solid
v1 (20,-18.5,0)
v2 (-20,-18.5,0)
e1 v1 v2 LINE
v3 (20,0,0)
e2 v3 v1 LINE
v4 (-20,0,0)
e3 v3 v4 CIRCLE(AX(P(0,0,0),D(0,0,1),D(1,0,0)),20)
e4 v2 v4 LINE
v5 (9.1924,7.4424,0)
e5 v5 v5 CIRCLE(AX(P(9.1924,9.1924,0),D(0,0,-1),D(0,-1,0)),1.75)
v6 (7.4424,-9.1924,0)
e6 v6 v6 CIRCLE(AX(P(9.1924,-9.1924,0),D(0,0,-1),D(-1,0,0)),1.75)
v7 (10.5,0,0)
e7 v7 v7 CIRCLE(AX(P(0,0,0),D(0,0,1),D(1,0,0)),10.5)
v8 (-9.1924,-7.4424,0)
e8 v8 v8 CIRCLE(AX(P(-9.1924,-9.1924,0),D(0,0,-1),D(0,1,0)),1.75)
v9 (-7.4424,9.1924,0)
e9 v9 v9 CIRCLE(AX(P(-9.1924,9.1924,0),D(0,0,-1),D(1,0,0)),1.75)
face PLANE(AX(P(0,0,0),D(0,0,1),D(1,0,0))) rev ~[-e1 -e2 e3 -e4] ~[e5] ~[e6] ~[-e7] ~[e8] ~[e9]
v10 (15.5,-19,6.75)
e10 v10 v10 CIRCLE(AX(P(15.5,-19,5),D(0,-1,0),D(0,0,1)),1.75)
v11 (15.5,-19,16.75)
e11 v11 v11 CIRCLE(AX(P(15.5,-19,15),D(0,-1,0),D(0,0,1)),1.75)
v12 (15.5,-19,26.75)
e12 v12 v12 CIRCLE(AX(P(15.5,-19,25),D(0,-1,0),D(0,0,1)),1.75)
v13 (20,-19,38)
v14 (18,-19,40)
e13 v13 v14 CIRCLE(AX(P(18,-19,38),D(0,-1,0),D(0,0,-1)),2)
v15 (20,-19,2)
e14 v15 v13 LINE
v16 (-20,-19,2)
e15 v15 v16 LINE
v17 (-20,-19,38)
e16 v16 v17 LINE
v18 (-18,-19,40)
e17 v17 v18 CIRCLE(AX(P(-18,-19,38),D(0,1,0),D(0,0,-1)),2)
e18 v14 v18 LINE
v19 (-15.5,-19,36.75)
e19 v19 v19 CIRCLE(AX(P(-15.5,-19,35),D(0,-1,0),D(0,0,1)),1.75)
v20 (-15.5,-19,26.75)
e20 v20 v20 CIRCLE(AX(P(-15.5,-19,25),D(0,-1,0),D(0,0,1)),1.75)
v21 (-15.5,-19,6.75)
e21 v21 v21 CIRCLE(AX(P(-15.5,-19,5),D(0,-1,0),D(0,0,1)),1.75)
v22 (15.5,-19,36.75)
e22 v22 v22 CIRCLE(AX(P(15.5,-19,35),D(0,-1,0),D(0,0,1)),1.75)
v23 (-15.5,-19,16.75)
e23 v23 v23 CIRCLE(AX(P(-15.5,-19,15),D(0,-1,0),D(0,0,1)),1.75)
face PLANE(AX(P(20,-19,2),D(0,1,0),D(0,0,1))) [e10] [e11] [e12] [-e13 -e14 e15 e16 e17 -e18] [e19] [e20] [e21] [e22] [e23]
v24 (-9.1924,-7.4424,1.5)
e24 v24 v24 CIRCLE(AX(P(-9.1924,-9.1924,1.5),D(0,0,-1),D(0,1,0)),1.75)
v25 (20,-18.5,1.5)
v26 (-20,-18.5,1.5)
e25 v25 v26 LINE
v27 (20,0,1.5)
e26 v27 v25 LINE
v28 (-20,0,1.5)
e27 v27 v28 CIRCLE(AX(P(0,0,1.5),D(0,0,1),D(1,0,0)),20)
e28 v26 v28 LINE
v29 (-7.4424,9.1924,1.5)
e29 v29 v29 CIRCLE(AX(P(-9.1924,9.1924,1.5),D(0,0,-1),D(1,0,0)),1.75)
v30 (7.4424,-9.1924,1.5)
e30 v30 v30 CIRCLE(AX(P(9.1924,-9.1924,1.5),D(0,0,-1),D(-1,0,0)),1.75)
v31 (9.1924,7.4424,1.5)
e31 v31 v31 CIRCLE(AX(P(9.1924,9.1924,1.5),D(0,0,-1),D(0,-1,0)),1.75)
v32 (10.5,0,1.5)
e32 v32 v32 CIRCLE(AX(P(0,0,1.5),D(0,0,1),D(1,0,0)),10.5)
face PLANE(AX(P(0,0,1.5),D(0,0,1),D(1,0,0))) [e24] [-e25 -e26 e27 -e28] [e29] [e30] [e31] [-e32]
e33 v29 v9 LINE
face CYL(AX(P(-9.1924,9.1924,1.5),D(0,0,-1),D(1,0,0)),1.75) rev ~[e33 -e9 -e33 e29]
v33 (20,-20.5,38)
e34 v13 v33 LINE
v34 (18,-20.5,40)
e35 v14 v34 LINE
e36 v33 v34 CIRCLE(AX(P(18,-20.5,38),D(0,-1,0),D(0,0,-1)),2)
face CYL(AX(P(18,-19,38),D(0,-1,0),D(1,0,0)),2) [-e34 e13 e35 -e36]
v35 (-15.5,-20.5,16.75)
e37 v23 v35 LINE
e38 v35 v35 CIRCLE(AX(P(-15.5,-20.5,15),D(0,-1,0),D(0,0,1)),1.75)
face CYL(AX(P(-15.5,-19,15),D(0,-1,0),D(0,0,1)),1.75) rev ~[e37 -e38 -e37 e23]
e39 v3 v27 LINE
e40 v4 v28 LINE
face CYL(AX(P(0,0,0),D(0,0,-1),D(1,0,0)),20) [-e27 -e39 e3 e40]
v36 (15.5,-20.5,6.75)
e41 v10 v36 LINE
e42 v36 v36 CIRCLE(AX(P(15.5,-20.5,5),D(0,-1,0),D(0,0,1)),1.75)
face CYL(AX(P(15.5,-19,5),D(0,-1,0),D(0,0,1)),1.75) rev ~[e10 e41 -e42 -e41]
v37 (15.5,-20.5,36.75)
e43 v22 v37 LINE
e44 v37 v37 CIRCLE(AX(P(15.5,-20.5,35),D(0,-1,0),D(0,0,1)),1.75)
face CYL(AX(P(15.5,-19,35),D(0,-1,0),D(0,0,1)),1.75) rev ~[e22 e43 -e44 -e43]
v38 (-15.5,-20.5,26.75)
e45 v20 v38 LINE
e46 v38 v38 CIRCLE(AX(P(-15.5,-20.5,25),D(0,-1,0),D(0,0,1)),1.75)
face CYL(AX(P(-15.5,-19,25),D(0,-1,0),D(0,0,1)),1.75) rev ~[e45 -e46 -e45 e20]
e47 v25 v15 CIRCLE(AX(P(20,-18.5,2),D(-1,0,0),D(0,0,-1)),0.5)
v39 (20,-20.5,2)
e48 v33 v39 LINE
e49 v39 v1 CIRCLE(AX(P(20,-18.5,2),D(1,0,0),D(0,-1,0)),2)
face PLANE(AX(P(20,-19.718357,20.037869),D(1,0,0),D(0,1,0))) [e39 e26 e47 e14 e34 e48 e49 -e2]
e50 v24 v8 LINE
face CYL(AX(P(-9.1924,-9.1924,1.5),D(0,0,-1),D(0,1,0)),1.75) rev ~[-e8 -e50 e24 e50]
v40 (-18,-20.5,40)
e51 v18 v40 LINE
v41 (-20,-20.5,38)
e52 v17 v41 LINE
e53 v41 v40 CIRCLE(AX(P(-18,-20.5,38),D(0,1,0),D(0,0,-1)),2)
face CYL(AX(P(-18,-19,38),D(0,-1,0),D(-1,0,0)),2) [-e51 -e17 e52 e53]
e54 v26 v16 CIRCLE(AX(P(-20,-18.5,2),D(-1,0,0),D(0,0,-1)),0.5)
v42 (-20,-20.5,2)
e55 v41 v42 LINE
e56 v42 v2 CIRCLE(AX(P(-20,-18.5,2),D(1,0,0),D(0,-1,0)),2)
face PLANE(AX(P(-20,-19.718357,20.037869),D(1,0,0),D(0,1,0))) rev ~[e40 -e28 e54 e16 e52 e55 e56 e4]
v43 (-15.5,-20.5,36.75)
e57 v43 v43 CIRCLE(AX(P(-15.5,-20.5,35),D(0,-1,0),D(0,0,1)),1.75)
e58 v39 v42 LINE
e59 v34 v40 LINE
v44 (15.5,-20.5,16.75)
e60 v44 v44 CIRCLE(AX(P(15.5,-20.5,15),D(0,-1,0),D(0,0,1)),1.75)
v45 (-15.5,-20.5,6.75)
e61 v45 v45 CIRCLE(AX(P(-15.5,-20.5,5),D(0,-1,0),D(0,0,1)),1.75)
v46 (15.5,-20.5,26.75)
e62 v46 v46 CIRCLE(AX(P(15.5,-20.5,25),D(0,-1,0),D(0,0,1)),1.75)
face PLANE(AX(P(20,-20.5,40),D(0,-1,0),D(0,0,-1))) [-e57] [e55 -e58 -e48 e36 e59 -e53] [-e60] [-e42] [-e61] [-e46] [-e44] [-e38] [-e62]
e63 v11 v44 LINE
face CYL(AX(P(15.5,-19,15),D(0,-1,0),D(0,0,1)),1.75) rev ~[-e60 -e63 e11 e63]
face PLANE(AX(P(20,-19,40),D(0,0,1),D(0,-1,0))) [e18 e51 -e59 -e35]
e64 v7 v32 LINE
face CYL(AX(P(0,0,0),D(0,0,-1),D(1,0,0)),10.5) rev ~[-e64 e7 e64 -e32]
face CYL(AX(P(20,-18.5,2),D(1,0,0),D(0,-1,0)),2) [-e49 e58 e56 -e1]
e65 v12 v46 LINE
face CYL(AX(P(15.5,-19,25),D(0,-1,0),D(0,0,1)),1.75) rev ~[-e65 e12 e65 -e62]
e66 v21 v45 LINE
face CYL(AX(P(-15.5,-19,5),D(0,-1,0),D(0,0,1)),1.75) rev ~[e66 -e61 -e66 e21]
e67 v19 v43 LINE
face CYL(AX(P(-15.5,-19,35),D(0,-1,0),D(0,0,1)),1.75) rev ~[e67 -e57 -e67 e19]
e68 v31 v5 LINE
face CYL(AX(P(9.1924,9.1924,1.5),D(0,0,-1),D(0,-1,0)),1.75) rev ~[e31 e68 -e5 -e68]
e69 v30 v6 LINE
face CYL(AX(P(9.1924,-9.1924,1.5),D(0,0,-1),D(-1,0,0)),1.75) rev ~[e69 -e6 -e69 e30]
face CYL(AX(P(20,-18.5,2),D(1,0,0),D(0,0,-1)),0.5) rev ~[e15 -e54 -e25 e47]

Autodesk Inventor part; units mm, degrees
ref_plane "YZ Plane" through (0, 0, 0) normal (1, 0, 0) x (0, 1, 0)
ref_plane "XZ Plane" through (0, 0, 0) normal (0, 1, 0) x (-1, 0, 0)
ref_plane "XY Plane" through (0, 0, 0) normal (0, 0, 1) x (1, 0, 0)
sketch "Sketch1" plane through (0, 0, 0) normal (0, 0, 1) x (1, 0, 0)
  line L0 (20, 0) -> (20, -20.5)
  line L1 (20, -20.5) -> (-20, -20.5)
  line L2 (-20, -20.5) -> (-20, 0)
  arc A0 (20, 0) -> (-20, 0) centre (0, 0) ccw
  circle A1 centre (0, 0) radius 10.5
  dimension "d1" = 40
  dimension "d4" = 20
  dimension "d5" = 20.5
  dimension "d7" = 21
  dimension "d8" = 20
  dimension "MotorCenterOffset" = 20.5
extrude "Plate1" add sketch "Sketch1" along normal blind 1.5
sketch "Sketch3" plane through (20, -19, 0) normal (0, -1, 0) x (1, 0, 0)
  line L0 (-40, 0) -> (0, 0)
  line L1 (0, 0) -> (0, 40)
  line L2 (0, 40) -> (-40, 40)
  line L3 (-40, 40) -> (-40, 0)
edge flange "Flange1" height 40 angle 90 thickness 1.5 bend radius 0.5 thickness toward (0, -1, 0) relief tear relief width 1.5 relief depth 0.75 edges at (0, -20.5, 1.5) wall of the first edge with corners at (-20, -19, 0) (20, -19, 0) (20, -19, 40) (-20, -19, 40)
bend "Bend1"
corner "Corner1"
fillet "Corner Round1" radius 2 1 edges at (-20, -19.75, 40)
fillet "Corner Round1" radius 2 1 edges at (20, -19.75, 40)
sketch "Sketch4" plane through (-20, -19, 2) normal (0, 1, 0) x (1, 0, 0)
  line L0 (2, -38) -> (38, -38) projected
  line L1 (0, -36) -> (0, 0) projected
  line L2 (0, -33) -> (4.5, -33)
  line L3 (4.5, -33) -> (4.5, -38)
  point P0 (20, 2)
  dimension "d43" = 4.5
  dimension "d44" = 5
hole "Hole2" at (-15.5, -19, 35) direction (0, -1, 0) diameter 3.5 end through all
pattern_linear "Rectangular Pattern2" count 4 spacing 10 along (0, 0, -1) count 2 spacing 31 along (1, 0, 0) of "Hole2"
sketch "Sketch5" plane through (0, 0, 1.5) normal (0, 0, 1) x (1, 0, 0)
  line L0 (-20, -18.5) -> (-20, 0) projected
  circle A0 centre (0, 0) radius 10.5 projected
  line L1 (0, 0) -> (9.1924, 9.1924)
  circle A1 centre (0, 0) radius 13
  line L2 (0, 0) -> (13, 0)
  circle A2 centre (9.1924, 9.1924) radius 1.75
  dimension "d59" = 26
  dimension "d60" = 45
  dimension "d61" = 3.5
hole "Hole3" at (9.1924, 9.1924, 1.5) direction (0, 0, -1) diameter 3.5 end through all
pattern_circular "Circular Pattern1" count 4 over 360 about axis through (0, 0, 0) along (0, 0, 1) of "Hole3"
equation "\"d50\" = Thickness"
equation "\"d12\" = BendReliefWidth"
equation "\"d13\" = BendReliefDepth"
equation "\"d14\" = MinimumRemnant"
equation "\"d15\" = BendRadius"
equation "\"d19\" = CornerReliefSize"
equation "\"d20\" = GapSize"
equation "\"d21\" = JacobiRadiusSize"
equation "\"BendRadius\" = Thickness"
equation "\"BendReliefWidth\" = Thickness"
equation "\"BendReliefDepth\" = 0.5 * Thickness"
equation "\"CornerReliefSize\" = 4 * Thickness"
equation "\"MinimumRemnant\" = 2 * Thickness"
equation "\"TransitionRadius\" = BendRadius"
equation "\"JacobiRadiusSize\" = BendRadius"
equation "\"GapSize\" = Thickness"
equation "\"d10\" = BendRadius"
equation "\"Thickness\" = 1.5"
properties part number "HD-BK-IG" material "Galvanized Steel"
